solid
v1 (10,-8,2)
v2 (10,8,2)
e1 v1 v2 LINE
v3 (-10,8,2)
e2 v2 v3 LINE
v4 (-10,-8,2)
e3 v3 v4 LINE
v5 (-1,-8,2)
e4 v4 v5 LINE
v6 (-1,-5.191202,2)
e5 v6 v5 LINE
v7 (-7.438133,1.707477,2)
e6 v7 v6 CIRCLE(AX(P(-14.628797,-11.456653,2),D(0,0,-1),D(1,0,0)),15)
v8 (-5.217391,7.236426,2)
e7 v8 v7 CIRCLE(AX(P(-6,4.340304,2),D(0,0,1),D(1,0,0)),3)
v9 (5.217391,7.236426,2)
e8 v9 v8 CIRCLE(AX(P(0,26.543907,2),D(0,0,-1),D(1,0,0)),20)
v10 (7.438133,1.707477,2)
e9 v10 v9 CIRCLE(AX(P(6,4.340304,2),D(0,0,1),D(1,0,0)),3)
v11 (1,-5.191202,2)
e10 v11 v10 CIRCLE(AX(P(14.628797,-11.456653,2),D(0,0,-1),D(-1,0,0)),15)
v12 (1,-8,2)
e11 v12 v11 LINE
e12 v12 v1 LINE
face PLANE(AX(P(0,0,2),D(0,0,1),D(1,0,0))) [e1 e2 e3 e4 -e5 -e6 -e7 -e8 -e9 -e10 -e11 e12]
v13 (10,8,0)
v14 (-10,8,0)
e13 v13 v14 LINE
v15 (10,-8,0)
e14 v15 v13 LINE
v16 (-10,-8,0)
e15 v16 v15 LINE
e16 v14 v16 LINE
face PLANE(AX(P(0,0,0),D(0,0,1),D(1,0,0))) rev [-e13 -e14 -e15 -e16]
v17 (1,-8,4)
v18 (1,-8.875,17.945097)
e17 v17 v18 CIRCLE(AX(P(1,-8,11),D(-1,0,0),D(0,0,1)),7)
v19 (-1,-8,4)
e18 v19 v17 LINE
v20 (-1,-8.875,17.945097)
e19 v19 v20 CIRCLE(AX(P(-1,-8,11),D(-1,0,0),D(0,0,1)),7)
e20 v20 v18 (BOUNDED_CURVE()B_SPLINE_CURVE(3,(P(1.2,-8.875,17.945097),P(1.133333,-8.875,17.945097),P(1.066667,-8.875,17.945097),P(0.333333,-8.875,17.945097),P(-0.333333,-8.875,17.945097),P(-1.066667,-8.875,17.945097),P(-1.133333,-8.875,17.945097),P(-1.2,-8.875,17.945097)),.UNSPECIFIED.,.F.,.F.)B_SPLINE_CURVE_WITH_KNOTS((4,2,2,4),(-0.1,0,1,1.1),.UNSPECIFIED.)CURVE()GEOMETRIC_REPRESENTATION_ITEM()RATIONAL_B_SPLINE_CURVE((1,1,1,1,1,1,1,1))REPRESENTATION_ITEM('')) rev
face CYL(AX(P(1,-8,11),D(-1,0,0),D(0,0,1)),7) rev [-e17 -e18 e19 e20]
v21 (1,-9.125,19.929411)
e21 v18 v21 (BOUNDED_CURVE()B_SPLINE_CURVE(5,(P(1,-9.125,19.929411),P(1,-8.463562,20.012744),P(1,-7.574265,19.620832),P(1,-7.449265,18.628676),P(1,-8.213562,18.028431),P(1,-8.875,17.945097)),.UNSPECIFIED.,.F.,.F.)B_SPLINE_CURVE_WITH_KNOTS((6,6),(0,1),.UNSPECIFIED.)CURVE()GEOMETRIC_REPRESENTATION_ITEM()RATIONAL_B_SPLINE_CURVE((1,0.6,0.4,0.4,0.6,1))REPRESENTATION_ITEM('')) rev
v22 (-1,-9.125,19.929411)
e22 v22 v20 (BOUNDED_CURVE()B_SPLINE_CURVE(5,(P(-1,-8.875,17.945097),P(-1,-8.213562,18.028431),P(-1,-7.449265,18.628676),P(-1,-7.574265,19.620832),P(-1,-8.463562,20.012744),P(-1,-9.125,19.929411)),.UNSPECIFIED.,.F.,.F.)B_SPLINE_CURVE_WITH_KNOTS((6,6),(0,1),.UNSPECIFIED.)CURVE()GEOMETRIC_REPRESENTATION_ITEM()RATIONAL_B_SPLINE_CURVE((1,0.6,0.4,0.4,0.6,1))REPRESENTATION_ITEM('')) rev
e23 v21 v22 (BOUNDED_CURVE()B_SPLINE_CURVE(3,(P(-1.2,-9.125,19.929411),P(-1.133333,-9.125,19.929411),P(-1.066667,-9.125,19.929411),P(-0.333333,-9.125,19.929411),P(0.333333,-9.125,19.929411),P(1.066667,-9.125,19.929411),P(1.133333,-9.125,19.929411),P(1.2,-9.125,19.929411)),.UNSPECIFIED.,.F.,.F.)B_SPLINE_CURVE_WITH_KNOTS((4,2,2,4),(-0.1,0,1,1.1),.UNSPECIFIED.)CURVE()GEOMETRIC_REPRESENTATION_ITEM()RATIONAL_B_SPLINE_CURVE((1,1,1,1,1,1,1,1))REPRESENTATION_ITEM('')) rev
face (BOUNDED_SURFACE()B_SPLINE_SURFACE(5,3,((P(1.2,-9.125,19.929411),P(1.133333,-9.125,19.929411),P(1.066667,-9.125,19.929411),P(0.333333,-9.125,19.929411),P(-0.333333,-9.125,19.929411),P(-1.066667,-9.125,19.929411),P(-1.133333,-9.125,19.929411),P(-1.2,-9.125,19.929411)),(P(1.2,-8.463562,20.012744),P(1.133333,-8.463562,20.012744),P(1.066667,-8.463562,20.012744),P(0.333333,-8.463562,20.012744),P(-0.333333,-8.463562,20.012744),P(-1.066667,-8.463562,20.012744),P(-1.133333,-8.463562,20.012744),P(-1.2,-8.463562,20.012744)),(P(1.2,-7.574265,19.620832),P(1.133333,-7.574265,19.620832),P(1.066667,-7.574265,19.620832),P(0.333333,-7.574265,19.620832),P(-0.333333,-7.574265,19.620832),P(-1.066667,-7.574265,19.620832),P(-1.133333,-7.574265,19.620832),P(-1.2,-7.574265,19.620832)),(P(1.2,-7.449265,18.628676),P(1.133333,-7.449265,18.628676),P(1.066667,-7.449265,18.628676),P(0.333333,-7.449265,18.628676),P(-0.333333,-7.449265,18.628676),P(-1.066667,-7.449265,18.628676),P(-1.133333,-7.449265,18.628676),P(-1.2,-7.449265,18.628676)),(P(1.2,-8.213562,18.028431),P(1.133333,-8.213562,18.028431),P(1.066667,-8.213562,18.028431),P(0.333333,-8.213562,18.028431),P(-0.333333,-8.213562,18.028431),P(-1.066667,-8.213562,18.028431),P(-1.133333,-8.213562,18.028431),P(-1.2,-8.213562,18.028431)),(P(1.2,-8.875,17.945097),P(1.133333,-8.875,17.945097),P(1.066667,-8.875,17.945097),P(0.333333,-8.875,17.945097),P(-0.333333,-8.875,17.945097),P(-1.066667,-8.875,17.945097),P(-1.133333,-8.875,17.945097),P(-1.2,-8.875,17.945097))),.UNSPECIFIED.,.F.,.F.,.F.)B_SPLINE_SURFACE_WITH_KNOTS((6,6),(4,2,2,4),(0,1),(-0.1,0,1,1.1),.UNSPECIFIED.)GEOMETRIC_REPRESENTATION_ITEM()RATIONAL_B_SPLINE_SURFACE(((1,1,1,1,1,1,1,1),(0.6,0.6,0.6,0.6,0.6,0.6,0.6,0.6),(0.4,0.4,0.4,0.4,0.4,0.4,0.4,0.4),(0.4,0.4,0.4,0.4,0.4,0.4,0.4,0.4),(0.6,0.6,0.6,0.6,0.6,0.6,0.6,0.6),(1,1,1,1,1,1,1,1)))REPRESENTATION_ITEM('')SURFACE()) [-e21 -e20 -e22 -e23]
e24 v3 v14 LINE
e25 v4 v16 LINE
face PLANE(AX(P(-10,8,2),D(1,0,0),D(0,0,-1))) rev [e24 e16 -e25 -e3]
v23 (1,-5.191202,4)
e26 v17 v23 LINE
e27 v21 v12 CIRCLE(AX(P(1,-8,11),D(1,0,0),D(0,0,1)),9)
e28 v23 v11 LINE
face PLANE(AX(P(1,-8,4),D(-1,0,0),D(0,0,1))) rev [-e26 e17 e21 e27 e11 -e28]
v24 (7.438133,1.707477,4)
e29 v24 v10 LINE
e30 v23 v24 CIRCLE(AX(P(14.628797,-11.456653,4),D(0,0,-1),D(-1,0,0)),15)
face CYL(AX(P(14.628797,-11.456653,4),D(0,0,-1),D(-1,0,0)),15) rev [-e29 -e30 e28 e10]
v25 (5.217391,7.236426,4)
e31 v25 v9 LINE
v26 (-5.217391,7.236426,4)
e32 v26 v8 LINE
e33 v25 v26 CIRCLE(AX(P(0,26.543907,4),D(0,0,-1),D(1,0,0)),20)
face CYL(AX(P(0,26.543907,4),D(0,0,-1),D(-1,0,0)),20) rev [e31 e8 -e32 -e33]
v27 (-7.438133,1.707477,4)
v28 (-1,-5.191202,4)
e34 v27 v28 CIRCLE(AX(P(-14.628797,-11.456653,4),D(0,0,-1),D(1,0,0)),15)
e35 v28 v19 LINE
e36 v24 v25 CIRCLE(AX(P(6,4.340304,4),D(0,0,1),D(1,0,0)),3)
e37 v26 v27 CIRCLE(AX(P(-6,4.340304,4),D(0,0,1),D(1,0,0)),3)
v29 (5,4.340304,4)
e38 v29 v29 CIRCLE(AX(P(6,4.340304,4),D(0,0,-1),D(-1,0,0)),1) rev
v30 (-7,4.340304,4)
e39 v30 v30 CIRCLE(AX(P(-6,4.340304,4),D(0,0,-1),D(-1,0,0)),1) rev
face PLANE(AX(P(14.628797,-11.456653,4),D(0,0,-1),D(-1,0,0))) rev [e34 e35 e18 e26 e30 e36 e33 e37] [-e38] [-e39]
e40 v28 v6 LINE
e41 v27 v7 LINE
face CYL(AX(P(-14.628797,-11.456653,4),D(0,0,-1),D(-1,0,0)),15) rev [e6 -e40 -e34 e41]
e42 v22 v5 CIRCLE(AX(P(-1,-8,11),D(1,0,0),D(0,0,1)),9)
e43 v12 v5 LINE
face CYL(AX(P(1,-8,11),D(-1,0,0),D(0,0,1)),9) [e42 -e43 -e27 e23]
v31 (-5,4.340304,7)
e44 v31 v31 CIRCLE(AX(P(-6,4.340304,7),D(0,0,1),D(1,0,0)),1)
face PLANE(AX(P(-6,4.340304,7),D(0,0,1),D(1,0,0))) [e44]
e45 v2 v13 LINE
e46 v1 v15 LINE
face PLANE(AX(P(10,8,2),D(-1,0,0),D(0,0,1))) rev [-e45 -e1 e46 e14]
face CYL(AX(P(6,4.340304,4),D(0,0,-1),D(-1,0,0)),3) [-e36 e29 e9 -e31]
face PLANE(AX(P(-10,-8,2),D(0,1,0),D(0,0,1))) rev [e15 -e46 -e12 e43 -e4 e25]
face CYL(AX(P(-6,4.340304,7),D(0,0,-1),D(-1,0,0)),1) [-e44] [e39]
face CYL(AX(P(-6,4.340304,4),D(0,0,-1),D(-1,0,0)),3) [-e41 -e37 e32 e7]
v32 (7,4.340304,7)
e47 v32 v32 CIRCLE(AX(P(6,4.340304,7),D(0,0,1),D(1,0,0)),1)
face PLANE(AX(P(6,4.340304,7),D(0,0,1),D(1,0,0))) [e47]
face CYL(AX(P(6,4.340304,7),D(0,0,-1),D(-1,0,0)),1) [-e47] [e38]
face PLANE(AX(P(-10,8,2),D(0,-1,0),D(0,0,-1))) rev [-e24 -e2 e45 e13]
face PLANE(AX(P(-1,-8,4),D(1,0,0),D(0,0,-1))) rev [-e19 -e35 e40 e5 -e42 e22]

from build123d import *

# Parameters (mm, degrees)
SKETCH1_W           = 20
SKETCH1_H           = 16
BOSS_EXTRUDE1_DEPTH = 2
BOSS_EXTRUDE2_DEPTH = 2
BOSS_EXTRUDE3_DEPTH = 1
FILLET1_START       = -2
FILLET1_DEPTH       = 4
SKETCH4_R           = 1
BOSS_EXTRUDE4_DEPTH = 3


with BuildPart() as part:
    # Sketch1 → Boss-Extrude1 (new body)
    with BuildSketch(Plane.XY):
        Rectangle(SKETCH1_W, SKETCH1_H)
    extrude(amount=BOSS_EXTRUDE1_DEPTH)

    # Sketch2 → Boss-Extrude2 (add)
    with BuildSketch(Plane.XY.offset(2)):
        with BuildLine():
            Line((-1, -8), (-1, -5.19120215))
            ThreePointArc((-1, -5.19120215), (-3.662465131, -1.222418993), (-7.438132905, 1.707477453))
            ThreePointArc((-7.438132905, 1.707477453), (-8.78383647, 5.458451445), (-5.217391304, 7.236425814))
            ThreePointArc((-5.217391304, 7.236425814), (0, 6.543906954), (5.217391304, 7.236425814))
            ThreePointArc((5.217391304, 7.236425814), (8.78383647, 5.458451445), (7.438132905, 1.707477453))
            ThreePointArc((7.438132905, 1.707477453), (3.662465131, -1.222418993), (1, -5.19120215))
            Line((1, -5.19120215), (1, -8))
            Line((1, -8), (-1, -8))
        make_face()
    extrude(amount=BOSS_EXTRUDE2_DEPTH)

    # Sketch3 → Boss-Extrude3 (add, symmetric)
    with BuildSketch(Plane(origin=(0, 0, 0), x_dir=(0, 0, -1), z_dir=(1, 0, 0))):
        with BuildLine():
            Line((-4, -8), (-2, -8))
            ThreePointArc((-2, -8), (-11, -17), (-20, -8))
            Line((-20, -8), (-18, -8))
            ThreePointArc((-18, -8), (-11, -15), (-4, -8))
        make_face()
    extrude(amount=BOSS_EXTRUDE3_DEPTH, both=True)

    # Fillet1: read off the stored shape, not the designer's step
    # Fillet1 outline → Fillet1 (cut)
    with BuildSketch(Plane.YZ.offset(FILLET1_START)):
        with BuildLine():
            ThreePointArc((-8, 20), (-8.563606213, 19.982335333), (-9.125, 19.929410675))
            add(Edge.make_bspline(
                [(-9.125, 19.929410675), (-8.857196429, 19.963150753), (-8.534549287, 19.913651104), (-8.211558936, 19.723387149), (-8.000000009, 19.372242351), (-8, 18.937253953)],
                knots=[0, 0, 0, 0, 0, 0, 0.531373028, 0.531373028, 0.531373028, 0.531373028, 0.531373028, 0.531373028], degree=5, weights=[1, 0.787450789, 0.631373036, 0.531766743, 0.488631909, 0.501968534]))
            Line((-8, 18.937253953), (-8, 20))
        make_face()
        with BuildLine():
            Line((-8, 18), (-8, 18.937253953))
            add(Edge.make_bspline(
                [(-8, 18.937253953), (-7.999999993, 18.572372269), (-8.153666641, 18.269213464), (-8.39236455, 18.072074091), (-8.646114708, 17.973934028), (-8.875, 17.945097192)],
                knots=[0.531373028, 0.531373028, 0.531373028, 0.531373028, 0.531373028, 0.531373028, 1, 1, 1, 1, 1, 1], degree=5, weights=[0.501968534, 0.513730332, 0.569414377, 0.66902067, 0.812549211, 1]))
            ThreePointArc((-8.875, 17.945097192), (-8.438360388, 17.986260815), (-8, 18))
        make_face()
    extrude(amount=FILLET1_DEPTH, mode=Mode.SUBTRACT)

    # Sketch4 → Boss-Extrude4 (add)
    with BuildSketch(Plane.XY.offset(4)):
        with Locations(Location((-6, 4.340303643, 0), (0, 0, 180))):
            Circle(SKETCH4_R)
        with Locations(Location((6, 4.340303643, 0), (0, 0, 180))):
            Circle(SKETCH4_R)
    extrude(amount=BOSS_EXTRUDE4_DEPTH)


solid = part.part
